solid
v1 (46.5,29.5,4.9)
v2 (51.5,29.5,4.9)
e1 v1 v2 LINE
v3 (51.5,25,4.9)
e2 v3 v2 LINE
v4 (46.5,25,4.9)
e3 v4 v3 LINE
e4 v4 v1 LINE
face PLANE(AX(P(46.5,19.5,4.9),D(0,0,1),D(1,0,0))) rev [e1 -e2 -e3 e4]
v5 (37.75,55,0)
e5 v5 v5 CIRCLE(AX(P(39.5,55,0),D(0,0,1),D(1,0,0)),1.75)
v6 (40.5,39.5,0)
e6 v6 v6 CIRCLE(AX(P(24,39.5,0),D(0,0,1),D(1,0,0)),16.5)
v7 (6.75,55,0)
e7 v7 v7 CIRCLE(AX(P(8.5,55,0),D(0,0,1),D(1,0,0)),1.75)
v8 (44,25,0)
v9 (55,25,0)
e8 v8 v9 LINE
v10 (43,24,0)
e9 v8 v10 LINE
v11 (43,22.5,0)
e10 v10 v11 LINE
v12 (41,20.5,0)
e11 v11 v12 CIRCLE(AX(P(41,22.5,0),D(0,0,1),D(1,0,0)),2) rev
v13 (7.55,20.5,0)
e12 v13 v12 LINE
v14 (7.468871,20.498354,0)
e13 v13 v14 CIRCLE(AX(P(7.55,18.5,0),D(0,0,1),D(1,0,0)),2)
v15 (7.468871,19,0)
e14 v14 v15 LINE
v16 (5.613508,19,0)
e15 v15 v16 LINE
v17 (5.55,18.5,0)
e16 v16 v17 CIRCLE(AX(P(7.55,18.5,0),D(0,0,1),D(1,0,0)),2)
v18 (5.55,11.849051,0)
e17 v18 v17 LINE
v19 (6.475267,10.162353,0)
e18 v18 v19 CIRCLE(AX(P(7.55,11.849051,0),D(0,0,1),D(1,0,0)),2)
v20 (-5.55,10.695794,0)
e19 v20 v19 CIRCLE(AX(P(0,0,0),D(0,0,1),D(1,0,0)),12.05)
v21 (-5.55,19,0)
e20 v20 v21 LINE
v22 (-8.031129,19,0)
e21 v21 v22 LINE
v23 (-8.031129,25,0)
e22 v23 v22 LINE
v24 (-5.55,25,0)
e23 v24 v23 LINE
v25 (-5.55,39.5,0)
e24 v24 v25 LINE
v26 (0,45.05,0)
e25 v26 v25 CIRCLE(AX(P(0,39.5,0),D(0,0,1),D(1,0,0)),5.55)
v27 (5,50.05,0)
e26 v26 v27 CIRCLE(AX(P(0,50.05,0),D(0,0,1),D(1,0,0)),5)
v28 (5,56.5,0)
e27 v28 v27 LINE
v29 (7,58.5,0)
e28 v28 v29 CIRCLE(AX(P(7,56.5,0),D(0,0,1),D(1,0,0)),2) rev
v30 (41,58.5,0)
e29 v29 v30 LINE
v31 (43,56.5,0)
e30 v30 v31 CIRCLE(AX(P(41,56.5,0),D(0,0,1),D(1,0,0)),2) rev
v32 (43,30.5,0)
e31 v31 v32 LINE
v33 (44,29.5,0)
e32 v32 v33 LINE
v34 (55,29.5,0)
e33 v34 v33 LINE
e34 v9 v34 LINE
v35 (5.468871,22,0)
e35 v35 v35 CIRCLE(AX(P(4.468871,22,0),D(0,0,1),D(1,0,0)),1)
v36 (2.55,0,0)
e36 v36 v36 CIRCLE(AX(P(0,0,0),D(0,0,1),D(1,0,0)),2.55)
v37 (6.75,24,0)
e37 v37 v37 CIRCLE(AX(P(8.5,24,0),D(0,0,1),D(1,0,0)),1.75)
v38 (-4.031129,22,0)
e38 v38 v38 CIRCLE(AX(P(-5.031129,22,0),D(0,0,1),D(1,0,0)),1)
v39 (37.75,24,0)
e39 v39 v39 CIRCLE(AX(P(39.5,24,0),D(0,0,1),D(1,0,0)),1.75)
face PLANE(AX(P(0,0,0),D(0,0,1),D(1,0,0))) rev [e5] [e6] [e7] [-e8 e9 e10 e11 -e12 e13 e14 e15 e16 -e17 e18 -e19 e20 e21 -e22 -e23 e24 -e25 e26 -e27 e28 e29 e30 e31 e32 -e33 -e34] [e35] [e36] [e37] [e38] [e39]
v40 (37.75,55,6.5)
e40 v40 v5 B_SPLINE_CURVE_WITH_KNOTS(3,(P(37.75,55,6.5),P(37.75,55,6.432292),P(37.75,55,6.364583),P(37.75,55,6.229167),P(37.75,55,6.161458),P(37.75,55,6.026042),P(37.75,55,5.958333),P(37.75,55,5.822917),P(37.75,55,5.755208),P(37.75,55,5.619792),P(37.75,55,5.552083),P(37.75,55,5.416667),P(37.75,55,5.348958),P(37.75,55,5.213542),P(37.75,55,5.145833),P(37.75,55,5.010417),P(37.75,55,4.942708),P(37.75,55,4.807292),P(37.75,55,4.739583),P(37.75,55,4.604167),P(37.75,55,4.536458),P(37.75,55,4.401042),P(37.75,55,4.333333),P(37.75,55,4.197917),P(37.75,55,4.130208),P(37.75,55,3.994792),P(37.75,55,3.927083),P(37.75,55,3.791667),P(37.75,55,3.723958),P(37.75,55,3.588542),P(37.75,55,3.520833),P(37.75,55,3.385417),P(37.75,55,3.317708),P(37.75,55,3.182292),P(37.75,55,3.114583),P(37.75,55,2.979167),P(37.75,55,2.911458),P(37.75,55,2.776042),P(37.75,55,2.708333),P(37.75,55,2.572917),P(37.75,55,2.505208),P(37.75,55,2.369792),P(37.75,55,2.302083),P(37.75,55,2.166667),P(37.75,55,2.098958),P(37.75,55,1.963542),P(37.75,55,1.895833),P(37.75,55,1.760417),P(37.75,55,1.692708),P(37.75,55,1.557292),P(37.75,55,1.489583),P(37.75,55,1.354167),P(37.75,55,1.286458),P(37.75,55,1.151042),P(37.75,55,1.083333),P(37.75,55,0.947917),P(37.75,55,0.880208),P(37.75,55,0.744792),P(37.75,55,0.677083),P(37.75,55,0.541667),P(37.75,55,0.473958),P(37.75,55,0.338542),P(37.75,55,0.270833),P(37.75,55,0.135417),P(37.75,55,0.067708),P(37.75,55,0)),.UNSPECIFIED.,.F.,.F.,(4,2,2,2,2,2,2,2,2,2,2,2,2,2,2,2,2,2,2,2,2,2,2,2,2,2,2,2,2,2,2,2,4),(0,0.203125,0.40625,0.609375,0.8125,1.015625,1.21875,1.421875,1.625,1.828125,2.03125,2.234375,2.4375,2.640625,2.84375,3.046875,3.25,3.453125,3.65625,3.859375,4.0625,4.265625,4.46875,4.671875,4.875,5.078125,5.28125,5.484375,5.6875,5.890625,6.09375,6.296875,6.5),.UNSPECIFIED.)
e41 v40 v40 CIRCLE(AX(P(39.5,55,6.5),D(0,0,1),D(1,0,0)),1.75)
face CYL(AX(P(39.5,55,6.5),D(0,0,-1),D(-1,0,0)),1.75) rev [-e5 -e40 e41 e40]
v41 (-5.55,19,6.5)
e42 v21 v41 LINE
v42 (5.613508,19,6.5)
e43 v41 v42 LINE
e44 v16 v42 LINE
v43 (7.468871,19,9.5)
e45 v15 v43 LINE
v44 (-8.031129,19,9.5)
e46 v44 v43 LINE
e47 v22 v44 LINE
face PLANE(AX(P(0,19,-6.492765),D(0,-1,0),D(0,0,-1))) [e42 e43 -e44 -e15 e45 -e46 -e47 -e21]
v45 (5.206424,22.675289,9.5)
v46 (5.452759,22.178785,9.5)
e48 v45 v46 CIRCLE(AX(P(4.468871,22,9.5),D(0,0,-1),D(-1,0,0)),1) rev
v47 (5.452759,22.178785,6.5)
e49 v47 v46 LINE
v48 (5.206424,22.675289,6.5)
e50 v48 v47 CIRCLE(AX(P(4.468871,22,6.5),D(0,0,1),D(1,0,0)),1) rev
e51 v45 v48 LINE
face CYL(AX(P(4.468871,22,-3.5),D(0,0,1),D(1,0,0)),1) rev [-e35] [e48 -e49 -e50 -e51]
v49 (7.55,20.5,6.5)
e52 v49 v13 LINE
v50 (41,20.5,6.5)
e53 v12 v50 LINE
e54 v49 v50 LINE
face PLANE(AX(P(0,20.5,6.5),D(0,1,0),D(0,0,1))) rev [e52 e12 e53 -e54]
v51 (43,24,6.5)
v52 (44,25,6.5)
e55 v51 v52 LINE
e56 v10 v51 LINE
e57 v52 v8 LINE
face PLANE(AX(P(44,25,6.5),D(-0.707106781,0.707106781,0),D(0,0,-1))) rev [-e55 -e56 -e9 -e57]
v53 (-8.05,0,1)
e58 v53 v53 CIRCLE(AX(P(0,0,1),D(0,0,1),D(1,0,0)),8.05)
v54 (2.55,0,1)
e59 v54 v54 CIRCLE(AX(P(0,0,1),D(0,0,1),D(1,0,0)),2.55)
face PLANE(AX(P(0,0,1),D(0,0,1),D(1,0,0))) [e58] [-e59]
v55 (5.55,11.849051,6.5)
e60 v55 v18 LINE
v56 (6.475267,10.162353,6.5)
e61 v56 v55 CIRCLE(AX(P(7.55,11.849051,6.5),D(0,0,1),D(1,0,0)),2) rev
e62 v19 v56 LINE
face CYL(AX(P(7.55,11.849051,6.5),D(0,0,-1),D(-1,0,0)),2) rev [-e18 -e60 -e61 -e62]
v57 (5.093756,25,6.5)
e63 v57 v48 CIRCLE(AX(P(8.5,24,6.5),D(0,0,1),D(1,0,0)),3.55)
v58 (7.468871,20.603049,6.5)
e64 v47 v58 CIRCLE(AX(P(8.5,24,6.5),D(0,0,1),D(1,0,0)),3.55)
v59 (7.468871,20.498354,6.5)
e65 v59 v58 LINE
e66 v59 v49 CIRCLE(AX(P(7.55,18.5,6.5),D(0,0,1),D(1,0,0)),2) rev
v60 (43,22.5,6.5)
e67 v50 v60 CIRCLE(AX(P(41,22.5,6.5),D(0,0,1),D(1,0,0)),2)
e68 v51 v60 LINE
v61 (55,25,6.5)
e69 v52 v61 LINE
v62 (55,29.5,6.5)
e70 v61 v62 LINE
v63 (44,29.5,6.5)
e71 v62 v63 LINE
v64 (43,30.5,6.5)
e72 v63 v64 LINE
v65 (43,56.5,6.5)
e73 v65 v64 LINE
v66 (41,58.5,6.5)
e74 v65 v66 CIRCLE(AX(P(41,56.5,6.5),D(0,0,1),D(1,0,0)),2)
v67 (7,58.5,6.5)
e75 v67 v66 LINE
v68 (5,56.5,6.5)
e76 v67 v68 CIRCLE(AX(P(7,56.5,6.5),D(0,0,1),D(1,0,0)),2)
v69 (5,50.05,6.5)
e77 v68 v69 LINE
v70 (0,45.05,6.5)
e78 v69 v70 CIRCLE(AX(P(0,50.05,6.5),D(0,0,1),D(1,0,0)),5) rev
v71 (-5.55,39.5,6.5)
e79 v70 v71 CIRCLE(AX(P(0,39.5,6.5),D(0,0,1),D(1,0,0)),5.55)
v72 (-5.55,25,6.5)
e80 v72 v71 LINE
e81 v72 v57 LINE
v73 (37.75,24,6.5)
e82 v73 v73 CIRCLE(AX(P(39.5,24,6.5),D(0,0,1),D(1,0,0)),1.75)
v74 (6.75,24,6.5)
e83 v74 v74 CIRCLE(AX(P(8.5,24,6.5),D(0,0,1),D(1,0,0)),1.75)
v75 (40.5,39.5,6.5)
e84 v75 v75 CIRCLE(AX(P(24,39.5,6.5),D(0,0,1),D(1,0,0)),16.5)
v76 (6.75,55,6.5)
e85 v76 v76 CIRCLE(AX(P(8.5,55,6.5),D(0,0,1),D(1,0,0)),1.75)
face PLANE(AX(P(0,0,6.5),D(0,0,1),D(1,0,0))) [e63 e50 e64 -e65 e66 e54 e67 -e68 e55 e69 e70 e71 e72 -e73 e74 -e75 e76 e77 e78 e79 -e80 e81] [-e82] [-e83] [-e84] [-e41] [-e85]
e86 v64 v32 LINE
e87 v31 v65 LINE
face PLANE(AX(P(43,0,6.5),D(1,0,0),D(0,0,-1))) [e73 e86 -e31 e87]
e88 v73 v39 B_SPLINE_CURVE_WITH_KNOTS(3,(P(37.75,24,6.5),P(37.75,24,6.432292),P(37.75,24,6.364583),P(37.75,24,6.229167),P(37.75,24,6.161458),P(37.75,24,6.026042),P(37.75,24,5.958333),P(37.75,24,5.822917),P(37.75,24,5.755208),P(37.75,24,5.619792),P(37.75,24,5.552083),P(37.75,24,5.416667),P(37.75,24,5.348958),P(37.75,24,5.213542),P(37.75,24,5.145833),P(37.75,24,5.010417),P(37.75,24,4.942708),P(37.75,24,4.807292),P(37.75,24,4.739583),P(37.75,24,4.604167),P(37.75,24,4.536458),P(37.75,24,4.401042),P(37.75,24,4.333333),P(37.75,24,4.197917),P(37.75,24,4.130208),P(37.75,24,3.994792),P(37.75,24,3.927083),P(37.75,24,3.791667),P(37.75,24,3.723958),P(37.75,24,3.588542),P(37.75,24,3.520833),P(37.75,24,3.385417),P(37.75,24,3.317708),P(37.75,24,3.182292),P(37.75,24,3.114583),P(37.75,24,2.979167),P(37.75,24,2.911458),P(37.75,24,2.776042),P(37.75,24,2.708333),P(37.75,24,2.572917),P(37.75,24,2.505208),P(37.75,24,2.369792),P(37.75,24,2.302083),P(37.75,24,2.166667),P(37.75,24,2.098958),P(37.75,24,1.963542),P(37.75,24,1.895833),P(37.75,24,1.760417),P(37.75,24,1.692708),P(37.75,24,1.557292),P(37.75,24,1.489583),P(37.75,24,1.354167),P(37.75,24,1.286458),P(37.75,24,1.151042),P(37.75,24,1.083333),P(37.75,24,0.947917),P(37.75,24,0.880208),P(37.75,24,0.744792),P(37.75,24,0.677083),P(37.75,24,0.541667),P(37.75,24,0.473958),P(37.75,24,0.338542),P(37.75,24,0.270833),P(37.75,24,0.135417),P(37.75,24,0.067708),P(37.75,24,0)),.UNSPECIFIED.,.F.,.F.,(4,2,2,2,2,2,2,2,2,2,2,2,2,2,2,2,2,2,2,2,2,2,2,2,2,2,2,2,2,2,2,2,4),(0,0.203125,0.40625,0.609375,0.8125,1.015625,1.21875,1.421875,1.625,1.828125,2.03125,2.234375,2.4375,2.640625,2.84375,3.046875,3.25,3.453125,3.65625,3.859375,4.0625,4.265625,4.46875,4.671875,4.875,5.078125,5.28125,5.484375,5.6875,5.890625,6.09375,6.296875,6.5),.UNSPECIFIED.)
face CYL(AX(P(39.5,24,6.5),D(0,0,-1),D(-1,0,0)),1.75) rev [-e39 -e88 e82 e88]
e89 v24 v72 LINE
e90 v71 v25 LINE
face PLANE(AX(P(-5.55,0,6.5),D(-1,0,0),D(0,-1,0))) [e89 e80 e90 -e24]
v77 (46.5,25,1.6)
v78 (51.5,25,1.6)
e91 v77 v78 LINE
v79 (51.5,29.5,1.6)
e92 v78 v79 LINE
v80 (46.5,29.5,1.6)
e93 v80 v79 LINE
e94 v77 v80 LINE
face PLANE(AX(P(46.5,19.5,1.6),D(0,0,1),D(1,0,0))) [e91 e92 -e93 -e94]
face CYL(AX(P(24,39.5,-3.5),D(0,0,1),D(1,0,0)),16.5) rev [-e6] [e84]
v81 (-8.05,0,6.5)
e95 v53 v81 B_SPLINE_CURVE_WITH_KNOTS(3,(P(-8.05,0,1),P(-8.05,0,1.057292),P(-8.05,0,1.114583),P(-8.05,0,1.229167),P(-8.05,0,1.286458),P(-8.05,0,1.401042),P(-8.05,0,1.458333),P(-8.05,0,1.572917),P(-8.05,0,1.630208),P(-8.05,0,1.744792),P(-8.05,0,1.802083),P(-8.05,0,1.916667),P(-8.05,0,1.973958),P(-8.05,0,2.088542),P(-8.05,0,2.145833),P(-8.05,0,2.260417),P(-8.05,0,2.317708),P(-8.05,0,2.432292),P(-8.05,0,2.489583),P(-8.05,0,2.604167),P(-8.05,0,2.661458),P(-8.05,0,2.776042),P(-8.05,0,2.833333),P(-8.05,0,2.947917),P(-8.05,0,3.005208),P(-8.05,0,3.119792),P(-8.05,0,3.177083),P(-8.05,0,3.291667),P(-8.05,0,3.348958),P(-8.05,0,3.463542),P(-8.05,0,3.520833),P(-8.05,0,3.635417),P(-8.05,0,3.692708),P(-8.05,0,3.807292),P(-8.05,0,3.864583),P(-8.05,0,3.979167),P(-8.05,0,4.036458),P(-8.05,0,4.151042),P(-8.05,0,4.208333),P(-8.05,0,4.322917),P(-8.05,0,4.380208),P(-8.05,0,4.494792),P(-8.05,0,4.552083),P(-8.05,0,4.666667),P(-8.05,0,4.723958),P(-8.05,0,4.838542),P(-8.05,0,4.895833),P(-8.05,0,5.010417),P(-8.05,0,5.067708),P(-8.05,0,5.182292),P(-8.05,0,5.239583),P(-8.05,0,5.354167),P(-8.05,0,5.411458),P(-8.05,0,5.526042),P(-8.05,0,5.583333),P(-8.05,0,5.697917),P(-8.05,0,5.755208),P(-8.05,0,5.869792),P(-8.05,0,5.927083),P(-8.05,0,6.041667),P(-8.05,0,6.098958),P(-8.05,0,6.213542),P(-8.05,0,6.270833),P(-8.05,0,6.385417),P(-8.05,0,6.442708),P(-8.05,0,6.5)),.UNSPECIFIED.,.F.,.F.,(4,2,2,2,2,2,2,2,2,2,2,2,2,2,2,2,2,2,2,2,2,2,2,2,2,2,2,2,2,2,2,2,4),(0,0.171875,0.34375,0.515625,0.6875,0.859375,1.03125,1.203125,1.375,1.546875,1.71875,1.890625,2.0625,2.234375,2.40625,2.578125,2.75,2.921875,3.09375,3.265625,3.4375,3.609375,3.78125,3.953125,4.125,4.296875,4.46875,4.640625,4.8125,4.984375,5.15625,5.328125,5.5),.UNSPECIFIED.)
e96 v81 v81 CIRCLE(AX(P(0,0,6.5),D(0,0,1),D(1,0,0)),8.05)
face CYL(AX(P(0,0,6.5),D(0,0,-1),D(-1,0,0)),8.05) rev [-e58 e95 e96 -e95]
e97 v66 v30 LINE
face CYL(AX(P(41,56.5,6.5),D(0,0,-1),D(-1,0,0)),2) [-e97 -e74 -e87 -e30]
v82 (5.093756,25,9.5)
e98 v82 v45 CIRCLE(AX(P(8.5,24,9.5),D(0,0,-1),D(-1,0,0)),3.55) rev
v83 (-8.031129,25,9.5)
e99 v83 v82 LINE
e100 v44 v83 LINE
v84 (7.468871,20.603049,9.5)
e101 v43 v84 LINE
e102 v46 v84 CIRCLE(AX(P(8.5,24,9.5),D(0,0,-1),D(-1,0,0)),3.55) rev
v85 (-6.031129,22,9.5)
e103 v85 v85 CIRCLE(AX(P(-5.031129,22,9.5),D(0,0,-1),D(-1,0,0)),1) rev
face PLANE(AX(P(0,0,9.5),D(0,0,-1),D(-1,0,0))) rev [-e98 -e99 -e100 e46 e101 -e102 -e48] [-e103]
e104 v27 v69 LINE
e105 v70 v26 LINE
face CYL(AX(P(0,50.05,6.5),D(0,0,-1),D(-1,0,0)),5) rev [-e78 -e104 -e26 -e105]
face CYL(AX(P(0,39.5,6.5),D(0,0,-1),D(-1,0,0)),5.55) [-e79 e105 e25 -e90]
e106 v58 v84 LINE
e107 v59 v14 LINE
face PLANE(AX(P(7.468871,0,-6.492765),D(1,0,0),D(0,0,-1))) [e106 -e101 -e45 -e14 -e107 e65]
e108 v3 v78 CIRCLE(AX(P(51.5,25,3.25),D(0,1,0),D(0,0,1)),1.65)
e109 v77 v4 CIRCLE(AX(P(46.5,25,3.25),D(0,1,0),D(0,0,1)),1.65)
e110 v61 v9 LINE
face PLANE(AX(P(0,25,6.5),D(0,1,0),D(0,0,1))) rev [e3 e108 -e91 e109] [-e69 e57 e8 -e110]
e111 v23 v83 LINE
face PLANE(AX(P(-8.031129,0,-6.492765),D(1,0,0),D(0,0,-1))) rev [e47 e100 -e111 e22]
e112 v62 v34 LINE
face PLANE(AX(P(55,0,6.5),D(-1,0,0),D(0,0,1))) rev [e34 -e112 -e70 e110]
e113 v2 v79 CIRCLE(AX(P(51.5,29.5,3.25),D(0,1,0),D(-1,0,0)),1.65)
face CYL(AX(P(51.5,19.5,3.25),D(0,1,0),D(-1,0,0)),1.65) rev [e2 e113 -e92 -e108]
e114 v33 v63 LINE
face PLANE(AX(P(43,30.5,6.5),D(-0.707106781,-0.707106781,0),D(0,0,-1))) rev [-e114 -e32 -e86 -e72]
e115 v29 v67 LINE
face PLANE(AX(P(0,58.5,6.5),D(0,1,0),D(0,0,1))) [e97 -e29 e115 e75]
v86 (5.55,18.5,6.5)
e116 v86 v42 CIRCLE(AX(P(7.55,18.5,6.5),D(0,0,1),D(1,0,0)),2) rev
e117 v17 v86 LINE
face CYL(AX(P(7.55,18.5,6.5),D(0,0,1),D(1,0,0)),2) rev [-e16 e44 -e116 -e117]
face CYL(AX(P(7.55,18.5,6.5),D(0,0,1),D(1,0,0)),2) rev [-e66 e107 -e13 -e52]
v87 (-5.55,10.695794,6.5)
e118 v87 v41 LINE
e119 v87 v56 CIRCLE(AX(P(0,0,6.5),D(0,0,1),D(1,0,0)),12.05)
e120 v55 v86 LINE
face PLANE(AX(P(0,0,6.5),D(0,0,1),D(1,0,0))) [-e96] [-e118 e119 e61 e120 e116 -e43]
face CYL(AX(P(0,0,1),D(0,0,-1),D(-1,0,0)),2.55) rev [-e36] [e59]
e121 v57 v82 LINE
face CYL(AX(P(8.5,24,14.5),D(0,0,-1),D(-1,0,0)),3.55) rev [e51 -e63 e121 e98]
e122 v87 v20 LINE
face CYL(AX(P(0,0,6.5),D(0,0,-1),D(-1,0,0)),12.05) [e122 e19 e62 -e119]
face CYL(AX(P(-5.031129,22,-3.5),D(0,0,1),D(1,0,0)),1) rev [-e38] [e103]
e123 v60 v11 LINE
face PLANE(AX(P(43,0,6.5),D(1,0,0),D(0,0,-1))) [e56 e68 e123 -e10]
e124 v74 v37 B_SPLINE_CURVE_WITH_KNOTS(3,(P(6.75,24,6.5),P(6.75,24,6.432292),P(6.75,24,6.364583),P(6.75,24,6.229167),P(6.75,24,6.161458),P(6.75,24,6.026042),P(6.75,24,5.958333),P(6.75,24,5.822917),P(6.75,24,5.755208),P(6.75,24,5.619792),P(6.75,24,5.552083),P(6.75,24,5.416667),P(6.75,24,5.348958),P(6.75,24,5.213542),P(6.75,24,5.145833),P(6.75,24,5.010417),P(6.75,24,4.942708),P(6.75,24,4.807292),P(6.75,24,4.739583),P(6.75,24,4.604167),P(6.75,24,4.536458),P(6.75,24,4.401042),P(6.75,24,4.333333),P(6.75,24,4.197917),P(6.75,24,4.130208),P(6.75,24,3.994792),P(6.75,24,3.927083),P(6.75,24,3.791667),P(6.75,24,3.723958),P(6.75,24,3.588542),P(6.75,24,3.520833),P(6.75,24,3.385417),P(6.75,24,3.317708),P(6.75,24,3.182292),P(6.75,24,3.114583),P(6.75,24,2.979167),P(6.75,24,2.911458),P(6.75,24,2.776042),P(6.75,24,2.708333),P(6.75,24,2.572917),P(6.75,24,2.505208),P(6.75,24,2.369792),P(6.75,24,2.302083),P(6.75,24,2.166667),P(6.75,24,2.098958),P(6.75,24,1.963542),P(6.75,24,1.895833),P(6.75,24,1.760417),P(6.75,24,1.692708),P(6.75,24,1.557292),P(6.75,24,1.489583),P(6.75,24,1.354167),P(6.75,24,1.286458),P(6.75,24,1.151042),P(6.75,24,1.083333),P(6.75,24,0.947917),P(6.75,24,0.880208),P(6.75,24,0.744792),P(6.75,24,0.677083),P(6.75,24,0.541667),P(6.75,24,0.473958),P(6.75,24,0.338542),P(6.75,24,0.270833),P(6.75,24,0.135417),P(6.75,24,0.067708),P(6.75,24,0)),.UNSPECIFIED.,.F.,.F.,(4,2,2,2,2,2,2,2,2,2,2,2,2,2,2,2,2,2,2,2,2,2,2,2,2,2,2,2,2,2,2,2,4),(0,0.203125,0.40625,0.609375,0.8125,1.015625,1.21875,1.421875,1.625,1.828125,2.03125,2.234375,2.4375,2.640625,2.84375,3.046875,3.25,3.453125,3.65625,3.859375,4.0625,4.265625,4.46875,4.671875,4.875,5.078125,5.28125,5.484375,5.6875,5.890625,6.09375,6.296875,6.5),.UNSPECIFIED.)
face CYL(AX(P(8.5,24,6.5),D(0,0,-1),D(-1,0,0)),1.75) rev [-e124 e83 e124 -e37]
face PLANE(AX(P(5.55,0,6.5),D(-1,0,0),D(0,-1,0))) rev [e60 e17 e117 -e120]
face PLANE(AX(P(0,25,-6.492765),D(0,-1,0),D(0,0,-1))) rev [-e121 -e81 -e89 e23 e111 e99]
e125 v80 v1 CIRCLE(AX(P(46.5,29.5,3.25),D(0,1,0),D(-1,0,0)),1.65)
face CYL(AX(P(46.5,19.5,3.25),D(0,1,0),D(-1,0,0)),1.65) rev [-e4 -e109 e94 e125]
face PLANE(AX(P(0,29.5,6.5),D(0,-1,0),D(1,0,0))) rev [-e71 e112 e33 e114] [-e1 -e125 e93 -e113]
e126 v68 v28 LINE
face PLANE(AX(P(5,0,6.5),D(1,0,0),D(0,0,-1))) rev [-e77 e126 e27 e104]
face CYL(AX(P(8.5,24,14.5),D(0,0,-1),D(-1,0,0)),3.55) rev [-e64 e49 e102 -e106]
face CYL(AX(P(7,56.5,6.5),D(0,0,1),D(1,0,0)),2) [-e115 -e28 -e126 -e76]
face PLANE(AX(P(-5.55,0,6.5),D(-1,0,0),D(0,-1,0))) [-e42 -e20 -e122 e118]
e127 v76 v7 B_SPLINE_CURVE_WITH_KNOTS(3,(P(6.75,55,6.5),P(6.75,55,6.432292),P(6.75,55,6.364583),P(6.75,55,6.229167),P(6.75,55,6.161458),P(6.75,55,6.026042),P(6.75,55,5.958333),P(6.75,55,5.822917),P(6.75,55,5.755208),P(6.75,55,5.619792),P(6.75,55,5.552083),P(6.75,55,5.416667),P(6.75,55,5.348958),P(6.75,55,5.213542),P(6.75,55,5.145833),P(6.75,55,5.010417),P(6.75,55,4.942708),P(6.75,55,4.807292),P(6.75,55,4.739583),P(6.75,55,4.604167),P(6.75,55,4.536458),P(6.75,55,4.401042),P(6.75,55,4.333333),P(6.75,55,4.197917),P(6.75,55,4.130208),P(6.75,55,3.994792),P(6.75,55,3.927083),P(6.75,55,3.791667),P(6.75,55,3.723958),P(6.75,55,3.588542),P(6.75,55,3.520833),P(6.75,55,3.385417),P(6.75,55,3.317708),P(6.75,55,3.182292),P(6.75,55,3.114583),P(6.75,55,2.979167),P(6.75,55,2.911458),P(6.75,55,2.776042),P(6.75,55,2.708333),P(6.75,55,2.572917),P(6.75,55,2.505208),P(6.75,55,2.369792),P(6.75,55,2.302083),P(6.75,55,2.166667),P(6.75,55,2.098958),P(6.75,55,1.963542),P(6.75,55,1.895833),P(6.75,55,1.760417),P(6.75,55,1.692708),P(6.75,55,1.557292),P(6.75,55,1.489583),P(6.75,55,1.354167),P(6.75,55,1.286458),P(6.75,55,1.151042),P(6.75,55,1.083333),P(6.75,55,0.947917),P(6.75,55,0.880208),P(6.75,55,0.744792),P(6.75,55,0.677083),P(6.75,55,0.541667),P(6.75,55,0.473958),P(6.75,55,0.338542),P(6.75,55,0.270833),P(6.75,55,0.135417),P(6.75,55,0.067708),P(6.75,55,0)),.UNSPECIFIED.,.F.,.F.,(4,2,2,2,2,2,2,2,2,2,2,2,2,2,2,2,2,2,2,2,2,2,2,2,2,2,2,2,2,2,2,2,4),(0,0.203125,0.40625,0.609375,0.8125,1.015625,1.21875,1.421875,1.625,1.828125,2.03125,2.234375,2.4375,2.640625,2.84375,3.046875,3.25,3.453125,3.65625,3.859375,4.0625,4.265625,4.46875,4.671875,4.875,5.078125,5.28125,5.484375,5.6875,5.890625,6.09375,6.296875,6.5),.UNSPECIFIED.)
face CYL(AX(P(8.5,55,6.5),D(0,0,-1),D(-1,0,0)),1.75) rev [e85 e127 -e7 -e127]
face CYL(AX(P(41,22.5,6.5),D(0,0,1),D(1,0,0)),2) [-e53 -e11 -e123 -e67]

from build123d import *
from build123d.topology import SkipClean

# Parameters (mm, degrees)
SKETCH1_R           = 8.05
SKETCH1_R_2         = 1.75
SKETCH1_R_3         = 12.5
BOSS_EXTRUDE3_DEPTH = 6.5
SKETCH1_5_R         = 2.55
BOSS_EXTRUDE2_DEPTH = 1
CUT_EXTRUDE1_DEPTH  = 10
FILLET2_R           = 2
FILLET5_R           = 5
CHAMFER2_SIZE       = 1
FILLET1_R           = 2
SKETCH5_R           = 16.5
CUT_EXTRUDE2_DEPTH  = 10
SKETCH4_R           = 1
CUT_EXTRUDE3_DEPTH  = 10
SKETCH4_4_W         = 1.918871126
SKETCH4_4_H         = 1.5
BOSS_EXTRUDE4_DEPTH = 6.5
SKETCH4_5_W         = 15.5
SKETCH4_5_H         = 6
BOSS_EXTRUDE5_DEPTH = 3
CUT_EXTRUDE5_START  = 9
SKETCH4_6_R         = 1
CUT_EXTRUDE5_DEPTH  = 9
SKETCH6_R           = 3.55
CUT_EXTRUDE6_DEPTH  = 8


with BuildPart() as part:
    # Sketch1 → Boss-Extrude3 (new body)
    with BuildSketch(Plane.XY):
        with BuildLine():
            ThreePointArc((-5.55, 10.695793566), (0, -12.05), (5.55, 10.695793566))
            Line((5.55, 10.695793566), (5.55, 20.5))
            Line((5.55, 20.5), (43, 20.5))
            Line((43, 20.5), (43, 25))
            Line((43, 25), (55, 25))
            Line((55, 25), (55, 29.5))
            Line((55, 29.5), (43, 29.5))
            Line((43, 29.5), (43, 58.5))
            Line((43, 58.5), (5, 58.5))
            Line((5, 58.5), (5, 45.05))
            Line((5, 45.05), (0, 45.05))
            ThreePointArc((0, 45.05), (-3.924442636, 43.424442636), (-5.55, 39.5))
            Line((-5.55, 39.5), (-5.55, 10.695793566))
        make_face()
        with Locations(Location((0, 0, 0), (0, 0, 180))):
            Circle(SKETCH1_R, mode=Mode.SUBTRACT)
        with Locations(Location((8.5, 24, 0), (0, 0, 180))):
            Circle(SKETCH1_R_2, mode=Mode.SUBTRACT)
        with Locations(Location((39.5, 24, 0), (0, 0, 180))):
            Circle(SKETCH1_R_2, mode=Mode.SUBTRACT)
        with Locations(Location((8.5, 55, 0), (0, 0, 180))):
            Circle(SKETCH1_R_2, mode=Mode.SUBTRACT)
        with Locations(Location((24, 39.5, 0), (0, 0, 180))):
            Circle(SKETCH1_R_3, mode=Mode.SUBTRACT)
        with Locations(Location((39.5, 55, 0), (0, 0, 180))):
            Circle(SKETCH1_R_2, mode=Mode.SUBTRACT)
    extrude(amount=BOSS_EXTRUDE3_DEPTH)

    # Sketch1<5> → Boss-Extrude2 (add)
    # profile 1 of 2: a face of its own
    with BuildSketch(Plane.XY):
        with BuildLine():
            Line((-5.55, 5.830951895), (-5.55, 0))
            ThreePointArc((-5.55, 0), (0, -5.55), (5.55, 0))
            Line((5.55, 0), (5.55, 5.830951895))
            ThreePointArc((5.55, 5.830951895), (0, 8.05), (-5.55, 5.830951895))
        make_face()
        Circle(SKETCH1_5_R, mode=Mode.SUBTRACT)
    # profile 2 of 2: a face of its own
    with BuildSketch(Plane.XY):
        with BuildLine():
            ThreePointArc((5.55, 0), (0, -5.55), (-5.55, 0))
            Line((-5.55, 0), (-5.55, 5.830951895))
            ThreePointArc((-5.55, 5.830951895), (-3.172144385, -7.398648525), (8.05, 0))
            ThreePointArc((8.05, 0), (7.398648525, 3.172144385), (5.55, 5.830951895))
            Line((5.55, 5.830951895), (5.55, 0))
        make_face()
    extrude(amount=BOSS_EXTRUDE2_DEPTH)

    # Sketch3 → Cut-Extrude1 (cut)
    with BuildSketch(Plane(origin=(0, 29.5, 0), x_dir=(1, 0, 0), z_dir=(0, 1, 0))):
        with BuildLine():
            Line((46.5, -1.6), (51.5, -1.6))
            ThreePointArc((51.5, -1.6), (53.15, -3.25), (51.5, -4.9))
            Line((51.5, -4.9), (46.5, -4.9))
            ThreePointArc((46.5, -4.9), (44.85, -3.25), (46.5, -1.6))
        make_face()
    extrude(amount=-CUT_EXTRUDE1_DEPTH, mode=Mode.SUBTRACT)

    # Fillet2
    fillet2_edges = [part.edges().sort_by_distance(p)[0] for p in [
        (5.55, 20.5, 3.25),
        (5.55, 10.695793566, 3.25),
    ]]
    fillet(fillet2_edges, radius=FILLET2_R)

    # Fillet5
    fillet5_edges = [part.edges().sort_by_distance(p)[0] for p in [
        (5, 45.05, 3.25),
    ]]
    fillet(fillet5_edges, radius=FILLET5_R - 0.0001)  # a hair under: the kernel refuses the full size

    # Chamfer2
    chamfer2_edges = [part.edges().sort_by_distance(p)[0] for p in [
        (43, 29.5, 3.25),
        (43, 25, 3.25),
    ]]
    chamfer(chamfer2_edges, length=CHAMFER2_SIZE)

    # Fillet1
    fillet1_edges = [part.edges().sort_by_distance(p)[0] for p in [
        (43, 20.5, 3.25),
        (5, 58.5, 3.25),
        (43, 58.5, 3.25),
    ]]
    fillet(fillet1_edges, radius=FILLET1_R)

    # Sketch5 → Cut-Extrude2 (cut)
    with BuildSketch(Plane.XY.offset(6.5)):
        with Locations((24, 39.5)):
            Circle(SKETCH5_R)
    extrude(amount=-CUT_EXTRUDE2_DEPTH, mode=Mode.SUBTRACT)

    # Sketch4 → Cut-Extrude3 (cut)
    with BuildSketch(Plane.XY.offset(6.5)):
        with Locations((4.468871126, 22)):
            Circle(SKETCH4_R)
        with Locations((-5.031128874, 22)):
            Circle(SKETCH4_R)
    extrude(amount=-CUT_EXTRUDE3_DEPTH, mode=Mode.SUBTRACT)

    # Sketch4<4> → Boss-Extrude4 (add)
    with BuildSketch(Plane.XY.offset(6.5)):
        with BuildLine():
            Line((-8.031128874, 25), (-8.031128874, 19))
            Line((-8.031128874, 19), (-5.55, 19))
            Line((-5.55, 19), (-5.55, 21.145147525))
            ThreePointArc((-5.55, 21.145147525), (-6.031128874, 22), (-5.55, 22.854852475))
            Line((-5.55, 22.854852475), (-5.55, 25))
            Line((-5.55, 25), (-8.031128874, 25))
        make_face()
        with Locations((6.509435563, 19.75)):
            Rectangle(SKETCH4_4_W, SKETCH4_4_H)
    extrude(amount=-BOSS_EXTRUDE4_DEPTH)

    # Sketch4<5> → Boss-Extrude5 (add)
    with BuildSketch(Plane.XY.offset(6.5)):
        with Locations((-0.281128874, 22)):
            Rectangle(SKETCH4_5_W, SKETCH4_5_H)
    extrude(amount=BOSS_EXTRUDE5_DEPTH)

    # Sketch4<6> → Cut-Extrude5 (cut)
    with SkipClean():  # the faces are left unmerged after this step: merging them gives an invalid solid
        with BuildSketch(Plane.XY.offset(6.5).offset(CUT_EXTRUDE5_START)):
            with Locations((4.468871126, 22)):
                Circle(SKETCH4_6_R)
            with Locations((-5.031128874, 22)):
                Circle(SKETCH4_6_R)
        extrude(amount=-CUT_EXTRUDE5_DEPTH, mode=Mode.SUBTRACT)
    add(part.part.scale(1), mode=Mode.REPLACE)  # the faces are merged on a copy

    # Sketch6 → Cut-Extrude6 (cut)
    with SkipClean():  # the faces are left unmerged after this step: merging them gives an invalid solid
        with BuildSketch(Plane.XY.offset(6.5)):
            with Locations((8.5, 24)):
                Circle(SKETCH6_R)
        extrude(amount=CUT_EXTRUDE6_DEPTH, mode=Mode.SUBTRACT)


solid = part.part
